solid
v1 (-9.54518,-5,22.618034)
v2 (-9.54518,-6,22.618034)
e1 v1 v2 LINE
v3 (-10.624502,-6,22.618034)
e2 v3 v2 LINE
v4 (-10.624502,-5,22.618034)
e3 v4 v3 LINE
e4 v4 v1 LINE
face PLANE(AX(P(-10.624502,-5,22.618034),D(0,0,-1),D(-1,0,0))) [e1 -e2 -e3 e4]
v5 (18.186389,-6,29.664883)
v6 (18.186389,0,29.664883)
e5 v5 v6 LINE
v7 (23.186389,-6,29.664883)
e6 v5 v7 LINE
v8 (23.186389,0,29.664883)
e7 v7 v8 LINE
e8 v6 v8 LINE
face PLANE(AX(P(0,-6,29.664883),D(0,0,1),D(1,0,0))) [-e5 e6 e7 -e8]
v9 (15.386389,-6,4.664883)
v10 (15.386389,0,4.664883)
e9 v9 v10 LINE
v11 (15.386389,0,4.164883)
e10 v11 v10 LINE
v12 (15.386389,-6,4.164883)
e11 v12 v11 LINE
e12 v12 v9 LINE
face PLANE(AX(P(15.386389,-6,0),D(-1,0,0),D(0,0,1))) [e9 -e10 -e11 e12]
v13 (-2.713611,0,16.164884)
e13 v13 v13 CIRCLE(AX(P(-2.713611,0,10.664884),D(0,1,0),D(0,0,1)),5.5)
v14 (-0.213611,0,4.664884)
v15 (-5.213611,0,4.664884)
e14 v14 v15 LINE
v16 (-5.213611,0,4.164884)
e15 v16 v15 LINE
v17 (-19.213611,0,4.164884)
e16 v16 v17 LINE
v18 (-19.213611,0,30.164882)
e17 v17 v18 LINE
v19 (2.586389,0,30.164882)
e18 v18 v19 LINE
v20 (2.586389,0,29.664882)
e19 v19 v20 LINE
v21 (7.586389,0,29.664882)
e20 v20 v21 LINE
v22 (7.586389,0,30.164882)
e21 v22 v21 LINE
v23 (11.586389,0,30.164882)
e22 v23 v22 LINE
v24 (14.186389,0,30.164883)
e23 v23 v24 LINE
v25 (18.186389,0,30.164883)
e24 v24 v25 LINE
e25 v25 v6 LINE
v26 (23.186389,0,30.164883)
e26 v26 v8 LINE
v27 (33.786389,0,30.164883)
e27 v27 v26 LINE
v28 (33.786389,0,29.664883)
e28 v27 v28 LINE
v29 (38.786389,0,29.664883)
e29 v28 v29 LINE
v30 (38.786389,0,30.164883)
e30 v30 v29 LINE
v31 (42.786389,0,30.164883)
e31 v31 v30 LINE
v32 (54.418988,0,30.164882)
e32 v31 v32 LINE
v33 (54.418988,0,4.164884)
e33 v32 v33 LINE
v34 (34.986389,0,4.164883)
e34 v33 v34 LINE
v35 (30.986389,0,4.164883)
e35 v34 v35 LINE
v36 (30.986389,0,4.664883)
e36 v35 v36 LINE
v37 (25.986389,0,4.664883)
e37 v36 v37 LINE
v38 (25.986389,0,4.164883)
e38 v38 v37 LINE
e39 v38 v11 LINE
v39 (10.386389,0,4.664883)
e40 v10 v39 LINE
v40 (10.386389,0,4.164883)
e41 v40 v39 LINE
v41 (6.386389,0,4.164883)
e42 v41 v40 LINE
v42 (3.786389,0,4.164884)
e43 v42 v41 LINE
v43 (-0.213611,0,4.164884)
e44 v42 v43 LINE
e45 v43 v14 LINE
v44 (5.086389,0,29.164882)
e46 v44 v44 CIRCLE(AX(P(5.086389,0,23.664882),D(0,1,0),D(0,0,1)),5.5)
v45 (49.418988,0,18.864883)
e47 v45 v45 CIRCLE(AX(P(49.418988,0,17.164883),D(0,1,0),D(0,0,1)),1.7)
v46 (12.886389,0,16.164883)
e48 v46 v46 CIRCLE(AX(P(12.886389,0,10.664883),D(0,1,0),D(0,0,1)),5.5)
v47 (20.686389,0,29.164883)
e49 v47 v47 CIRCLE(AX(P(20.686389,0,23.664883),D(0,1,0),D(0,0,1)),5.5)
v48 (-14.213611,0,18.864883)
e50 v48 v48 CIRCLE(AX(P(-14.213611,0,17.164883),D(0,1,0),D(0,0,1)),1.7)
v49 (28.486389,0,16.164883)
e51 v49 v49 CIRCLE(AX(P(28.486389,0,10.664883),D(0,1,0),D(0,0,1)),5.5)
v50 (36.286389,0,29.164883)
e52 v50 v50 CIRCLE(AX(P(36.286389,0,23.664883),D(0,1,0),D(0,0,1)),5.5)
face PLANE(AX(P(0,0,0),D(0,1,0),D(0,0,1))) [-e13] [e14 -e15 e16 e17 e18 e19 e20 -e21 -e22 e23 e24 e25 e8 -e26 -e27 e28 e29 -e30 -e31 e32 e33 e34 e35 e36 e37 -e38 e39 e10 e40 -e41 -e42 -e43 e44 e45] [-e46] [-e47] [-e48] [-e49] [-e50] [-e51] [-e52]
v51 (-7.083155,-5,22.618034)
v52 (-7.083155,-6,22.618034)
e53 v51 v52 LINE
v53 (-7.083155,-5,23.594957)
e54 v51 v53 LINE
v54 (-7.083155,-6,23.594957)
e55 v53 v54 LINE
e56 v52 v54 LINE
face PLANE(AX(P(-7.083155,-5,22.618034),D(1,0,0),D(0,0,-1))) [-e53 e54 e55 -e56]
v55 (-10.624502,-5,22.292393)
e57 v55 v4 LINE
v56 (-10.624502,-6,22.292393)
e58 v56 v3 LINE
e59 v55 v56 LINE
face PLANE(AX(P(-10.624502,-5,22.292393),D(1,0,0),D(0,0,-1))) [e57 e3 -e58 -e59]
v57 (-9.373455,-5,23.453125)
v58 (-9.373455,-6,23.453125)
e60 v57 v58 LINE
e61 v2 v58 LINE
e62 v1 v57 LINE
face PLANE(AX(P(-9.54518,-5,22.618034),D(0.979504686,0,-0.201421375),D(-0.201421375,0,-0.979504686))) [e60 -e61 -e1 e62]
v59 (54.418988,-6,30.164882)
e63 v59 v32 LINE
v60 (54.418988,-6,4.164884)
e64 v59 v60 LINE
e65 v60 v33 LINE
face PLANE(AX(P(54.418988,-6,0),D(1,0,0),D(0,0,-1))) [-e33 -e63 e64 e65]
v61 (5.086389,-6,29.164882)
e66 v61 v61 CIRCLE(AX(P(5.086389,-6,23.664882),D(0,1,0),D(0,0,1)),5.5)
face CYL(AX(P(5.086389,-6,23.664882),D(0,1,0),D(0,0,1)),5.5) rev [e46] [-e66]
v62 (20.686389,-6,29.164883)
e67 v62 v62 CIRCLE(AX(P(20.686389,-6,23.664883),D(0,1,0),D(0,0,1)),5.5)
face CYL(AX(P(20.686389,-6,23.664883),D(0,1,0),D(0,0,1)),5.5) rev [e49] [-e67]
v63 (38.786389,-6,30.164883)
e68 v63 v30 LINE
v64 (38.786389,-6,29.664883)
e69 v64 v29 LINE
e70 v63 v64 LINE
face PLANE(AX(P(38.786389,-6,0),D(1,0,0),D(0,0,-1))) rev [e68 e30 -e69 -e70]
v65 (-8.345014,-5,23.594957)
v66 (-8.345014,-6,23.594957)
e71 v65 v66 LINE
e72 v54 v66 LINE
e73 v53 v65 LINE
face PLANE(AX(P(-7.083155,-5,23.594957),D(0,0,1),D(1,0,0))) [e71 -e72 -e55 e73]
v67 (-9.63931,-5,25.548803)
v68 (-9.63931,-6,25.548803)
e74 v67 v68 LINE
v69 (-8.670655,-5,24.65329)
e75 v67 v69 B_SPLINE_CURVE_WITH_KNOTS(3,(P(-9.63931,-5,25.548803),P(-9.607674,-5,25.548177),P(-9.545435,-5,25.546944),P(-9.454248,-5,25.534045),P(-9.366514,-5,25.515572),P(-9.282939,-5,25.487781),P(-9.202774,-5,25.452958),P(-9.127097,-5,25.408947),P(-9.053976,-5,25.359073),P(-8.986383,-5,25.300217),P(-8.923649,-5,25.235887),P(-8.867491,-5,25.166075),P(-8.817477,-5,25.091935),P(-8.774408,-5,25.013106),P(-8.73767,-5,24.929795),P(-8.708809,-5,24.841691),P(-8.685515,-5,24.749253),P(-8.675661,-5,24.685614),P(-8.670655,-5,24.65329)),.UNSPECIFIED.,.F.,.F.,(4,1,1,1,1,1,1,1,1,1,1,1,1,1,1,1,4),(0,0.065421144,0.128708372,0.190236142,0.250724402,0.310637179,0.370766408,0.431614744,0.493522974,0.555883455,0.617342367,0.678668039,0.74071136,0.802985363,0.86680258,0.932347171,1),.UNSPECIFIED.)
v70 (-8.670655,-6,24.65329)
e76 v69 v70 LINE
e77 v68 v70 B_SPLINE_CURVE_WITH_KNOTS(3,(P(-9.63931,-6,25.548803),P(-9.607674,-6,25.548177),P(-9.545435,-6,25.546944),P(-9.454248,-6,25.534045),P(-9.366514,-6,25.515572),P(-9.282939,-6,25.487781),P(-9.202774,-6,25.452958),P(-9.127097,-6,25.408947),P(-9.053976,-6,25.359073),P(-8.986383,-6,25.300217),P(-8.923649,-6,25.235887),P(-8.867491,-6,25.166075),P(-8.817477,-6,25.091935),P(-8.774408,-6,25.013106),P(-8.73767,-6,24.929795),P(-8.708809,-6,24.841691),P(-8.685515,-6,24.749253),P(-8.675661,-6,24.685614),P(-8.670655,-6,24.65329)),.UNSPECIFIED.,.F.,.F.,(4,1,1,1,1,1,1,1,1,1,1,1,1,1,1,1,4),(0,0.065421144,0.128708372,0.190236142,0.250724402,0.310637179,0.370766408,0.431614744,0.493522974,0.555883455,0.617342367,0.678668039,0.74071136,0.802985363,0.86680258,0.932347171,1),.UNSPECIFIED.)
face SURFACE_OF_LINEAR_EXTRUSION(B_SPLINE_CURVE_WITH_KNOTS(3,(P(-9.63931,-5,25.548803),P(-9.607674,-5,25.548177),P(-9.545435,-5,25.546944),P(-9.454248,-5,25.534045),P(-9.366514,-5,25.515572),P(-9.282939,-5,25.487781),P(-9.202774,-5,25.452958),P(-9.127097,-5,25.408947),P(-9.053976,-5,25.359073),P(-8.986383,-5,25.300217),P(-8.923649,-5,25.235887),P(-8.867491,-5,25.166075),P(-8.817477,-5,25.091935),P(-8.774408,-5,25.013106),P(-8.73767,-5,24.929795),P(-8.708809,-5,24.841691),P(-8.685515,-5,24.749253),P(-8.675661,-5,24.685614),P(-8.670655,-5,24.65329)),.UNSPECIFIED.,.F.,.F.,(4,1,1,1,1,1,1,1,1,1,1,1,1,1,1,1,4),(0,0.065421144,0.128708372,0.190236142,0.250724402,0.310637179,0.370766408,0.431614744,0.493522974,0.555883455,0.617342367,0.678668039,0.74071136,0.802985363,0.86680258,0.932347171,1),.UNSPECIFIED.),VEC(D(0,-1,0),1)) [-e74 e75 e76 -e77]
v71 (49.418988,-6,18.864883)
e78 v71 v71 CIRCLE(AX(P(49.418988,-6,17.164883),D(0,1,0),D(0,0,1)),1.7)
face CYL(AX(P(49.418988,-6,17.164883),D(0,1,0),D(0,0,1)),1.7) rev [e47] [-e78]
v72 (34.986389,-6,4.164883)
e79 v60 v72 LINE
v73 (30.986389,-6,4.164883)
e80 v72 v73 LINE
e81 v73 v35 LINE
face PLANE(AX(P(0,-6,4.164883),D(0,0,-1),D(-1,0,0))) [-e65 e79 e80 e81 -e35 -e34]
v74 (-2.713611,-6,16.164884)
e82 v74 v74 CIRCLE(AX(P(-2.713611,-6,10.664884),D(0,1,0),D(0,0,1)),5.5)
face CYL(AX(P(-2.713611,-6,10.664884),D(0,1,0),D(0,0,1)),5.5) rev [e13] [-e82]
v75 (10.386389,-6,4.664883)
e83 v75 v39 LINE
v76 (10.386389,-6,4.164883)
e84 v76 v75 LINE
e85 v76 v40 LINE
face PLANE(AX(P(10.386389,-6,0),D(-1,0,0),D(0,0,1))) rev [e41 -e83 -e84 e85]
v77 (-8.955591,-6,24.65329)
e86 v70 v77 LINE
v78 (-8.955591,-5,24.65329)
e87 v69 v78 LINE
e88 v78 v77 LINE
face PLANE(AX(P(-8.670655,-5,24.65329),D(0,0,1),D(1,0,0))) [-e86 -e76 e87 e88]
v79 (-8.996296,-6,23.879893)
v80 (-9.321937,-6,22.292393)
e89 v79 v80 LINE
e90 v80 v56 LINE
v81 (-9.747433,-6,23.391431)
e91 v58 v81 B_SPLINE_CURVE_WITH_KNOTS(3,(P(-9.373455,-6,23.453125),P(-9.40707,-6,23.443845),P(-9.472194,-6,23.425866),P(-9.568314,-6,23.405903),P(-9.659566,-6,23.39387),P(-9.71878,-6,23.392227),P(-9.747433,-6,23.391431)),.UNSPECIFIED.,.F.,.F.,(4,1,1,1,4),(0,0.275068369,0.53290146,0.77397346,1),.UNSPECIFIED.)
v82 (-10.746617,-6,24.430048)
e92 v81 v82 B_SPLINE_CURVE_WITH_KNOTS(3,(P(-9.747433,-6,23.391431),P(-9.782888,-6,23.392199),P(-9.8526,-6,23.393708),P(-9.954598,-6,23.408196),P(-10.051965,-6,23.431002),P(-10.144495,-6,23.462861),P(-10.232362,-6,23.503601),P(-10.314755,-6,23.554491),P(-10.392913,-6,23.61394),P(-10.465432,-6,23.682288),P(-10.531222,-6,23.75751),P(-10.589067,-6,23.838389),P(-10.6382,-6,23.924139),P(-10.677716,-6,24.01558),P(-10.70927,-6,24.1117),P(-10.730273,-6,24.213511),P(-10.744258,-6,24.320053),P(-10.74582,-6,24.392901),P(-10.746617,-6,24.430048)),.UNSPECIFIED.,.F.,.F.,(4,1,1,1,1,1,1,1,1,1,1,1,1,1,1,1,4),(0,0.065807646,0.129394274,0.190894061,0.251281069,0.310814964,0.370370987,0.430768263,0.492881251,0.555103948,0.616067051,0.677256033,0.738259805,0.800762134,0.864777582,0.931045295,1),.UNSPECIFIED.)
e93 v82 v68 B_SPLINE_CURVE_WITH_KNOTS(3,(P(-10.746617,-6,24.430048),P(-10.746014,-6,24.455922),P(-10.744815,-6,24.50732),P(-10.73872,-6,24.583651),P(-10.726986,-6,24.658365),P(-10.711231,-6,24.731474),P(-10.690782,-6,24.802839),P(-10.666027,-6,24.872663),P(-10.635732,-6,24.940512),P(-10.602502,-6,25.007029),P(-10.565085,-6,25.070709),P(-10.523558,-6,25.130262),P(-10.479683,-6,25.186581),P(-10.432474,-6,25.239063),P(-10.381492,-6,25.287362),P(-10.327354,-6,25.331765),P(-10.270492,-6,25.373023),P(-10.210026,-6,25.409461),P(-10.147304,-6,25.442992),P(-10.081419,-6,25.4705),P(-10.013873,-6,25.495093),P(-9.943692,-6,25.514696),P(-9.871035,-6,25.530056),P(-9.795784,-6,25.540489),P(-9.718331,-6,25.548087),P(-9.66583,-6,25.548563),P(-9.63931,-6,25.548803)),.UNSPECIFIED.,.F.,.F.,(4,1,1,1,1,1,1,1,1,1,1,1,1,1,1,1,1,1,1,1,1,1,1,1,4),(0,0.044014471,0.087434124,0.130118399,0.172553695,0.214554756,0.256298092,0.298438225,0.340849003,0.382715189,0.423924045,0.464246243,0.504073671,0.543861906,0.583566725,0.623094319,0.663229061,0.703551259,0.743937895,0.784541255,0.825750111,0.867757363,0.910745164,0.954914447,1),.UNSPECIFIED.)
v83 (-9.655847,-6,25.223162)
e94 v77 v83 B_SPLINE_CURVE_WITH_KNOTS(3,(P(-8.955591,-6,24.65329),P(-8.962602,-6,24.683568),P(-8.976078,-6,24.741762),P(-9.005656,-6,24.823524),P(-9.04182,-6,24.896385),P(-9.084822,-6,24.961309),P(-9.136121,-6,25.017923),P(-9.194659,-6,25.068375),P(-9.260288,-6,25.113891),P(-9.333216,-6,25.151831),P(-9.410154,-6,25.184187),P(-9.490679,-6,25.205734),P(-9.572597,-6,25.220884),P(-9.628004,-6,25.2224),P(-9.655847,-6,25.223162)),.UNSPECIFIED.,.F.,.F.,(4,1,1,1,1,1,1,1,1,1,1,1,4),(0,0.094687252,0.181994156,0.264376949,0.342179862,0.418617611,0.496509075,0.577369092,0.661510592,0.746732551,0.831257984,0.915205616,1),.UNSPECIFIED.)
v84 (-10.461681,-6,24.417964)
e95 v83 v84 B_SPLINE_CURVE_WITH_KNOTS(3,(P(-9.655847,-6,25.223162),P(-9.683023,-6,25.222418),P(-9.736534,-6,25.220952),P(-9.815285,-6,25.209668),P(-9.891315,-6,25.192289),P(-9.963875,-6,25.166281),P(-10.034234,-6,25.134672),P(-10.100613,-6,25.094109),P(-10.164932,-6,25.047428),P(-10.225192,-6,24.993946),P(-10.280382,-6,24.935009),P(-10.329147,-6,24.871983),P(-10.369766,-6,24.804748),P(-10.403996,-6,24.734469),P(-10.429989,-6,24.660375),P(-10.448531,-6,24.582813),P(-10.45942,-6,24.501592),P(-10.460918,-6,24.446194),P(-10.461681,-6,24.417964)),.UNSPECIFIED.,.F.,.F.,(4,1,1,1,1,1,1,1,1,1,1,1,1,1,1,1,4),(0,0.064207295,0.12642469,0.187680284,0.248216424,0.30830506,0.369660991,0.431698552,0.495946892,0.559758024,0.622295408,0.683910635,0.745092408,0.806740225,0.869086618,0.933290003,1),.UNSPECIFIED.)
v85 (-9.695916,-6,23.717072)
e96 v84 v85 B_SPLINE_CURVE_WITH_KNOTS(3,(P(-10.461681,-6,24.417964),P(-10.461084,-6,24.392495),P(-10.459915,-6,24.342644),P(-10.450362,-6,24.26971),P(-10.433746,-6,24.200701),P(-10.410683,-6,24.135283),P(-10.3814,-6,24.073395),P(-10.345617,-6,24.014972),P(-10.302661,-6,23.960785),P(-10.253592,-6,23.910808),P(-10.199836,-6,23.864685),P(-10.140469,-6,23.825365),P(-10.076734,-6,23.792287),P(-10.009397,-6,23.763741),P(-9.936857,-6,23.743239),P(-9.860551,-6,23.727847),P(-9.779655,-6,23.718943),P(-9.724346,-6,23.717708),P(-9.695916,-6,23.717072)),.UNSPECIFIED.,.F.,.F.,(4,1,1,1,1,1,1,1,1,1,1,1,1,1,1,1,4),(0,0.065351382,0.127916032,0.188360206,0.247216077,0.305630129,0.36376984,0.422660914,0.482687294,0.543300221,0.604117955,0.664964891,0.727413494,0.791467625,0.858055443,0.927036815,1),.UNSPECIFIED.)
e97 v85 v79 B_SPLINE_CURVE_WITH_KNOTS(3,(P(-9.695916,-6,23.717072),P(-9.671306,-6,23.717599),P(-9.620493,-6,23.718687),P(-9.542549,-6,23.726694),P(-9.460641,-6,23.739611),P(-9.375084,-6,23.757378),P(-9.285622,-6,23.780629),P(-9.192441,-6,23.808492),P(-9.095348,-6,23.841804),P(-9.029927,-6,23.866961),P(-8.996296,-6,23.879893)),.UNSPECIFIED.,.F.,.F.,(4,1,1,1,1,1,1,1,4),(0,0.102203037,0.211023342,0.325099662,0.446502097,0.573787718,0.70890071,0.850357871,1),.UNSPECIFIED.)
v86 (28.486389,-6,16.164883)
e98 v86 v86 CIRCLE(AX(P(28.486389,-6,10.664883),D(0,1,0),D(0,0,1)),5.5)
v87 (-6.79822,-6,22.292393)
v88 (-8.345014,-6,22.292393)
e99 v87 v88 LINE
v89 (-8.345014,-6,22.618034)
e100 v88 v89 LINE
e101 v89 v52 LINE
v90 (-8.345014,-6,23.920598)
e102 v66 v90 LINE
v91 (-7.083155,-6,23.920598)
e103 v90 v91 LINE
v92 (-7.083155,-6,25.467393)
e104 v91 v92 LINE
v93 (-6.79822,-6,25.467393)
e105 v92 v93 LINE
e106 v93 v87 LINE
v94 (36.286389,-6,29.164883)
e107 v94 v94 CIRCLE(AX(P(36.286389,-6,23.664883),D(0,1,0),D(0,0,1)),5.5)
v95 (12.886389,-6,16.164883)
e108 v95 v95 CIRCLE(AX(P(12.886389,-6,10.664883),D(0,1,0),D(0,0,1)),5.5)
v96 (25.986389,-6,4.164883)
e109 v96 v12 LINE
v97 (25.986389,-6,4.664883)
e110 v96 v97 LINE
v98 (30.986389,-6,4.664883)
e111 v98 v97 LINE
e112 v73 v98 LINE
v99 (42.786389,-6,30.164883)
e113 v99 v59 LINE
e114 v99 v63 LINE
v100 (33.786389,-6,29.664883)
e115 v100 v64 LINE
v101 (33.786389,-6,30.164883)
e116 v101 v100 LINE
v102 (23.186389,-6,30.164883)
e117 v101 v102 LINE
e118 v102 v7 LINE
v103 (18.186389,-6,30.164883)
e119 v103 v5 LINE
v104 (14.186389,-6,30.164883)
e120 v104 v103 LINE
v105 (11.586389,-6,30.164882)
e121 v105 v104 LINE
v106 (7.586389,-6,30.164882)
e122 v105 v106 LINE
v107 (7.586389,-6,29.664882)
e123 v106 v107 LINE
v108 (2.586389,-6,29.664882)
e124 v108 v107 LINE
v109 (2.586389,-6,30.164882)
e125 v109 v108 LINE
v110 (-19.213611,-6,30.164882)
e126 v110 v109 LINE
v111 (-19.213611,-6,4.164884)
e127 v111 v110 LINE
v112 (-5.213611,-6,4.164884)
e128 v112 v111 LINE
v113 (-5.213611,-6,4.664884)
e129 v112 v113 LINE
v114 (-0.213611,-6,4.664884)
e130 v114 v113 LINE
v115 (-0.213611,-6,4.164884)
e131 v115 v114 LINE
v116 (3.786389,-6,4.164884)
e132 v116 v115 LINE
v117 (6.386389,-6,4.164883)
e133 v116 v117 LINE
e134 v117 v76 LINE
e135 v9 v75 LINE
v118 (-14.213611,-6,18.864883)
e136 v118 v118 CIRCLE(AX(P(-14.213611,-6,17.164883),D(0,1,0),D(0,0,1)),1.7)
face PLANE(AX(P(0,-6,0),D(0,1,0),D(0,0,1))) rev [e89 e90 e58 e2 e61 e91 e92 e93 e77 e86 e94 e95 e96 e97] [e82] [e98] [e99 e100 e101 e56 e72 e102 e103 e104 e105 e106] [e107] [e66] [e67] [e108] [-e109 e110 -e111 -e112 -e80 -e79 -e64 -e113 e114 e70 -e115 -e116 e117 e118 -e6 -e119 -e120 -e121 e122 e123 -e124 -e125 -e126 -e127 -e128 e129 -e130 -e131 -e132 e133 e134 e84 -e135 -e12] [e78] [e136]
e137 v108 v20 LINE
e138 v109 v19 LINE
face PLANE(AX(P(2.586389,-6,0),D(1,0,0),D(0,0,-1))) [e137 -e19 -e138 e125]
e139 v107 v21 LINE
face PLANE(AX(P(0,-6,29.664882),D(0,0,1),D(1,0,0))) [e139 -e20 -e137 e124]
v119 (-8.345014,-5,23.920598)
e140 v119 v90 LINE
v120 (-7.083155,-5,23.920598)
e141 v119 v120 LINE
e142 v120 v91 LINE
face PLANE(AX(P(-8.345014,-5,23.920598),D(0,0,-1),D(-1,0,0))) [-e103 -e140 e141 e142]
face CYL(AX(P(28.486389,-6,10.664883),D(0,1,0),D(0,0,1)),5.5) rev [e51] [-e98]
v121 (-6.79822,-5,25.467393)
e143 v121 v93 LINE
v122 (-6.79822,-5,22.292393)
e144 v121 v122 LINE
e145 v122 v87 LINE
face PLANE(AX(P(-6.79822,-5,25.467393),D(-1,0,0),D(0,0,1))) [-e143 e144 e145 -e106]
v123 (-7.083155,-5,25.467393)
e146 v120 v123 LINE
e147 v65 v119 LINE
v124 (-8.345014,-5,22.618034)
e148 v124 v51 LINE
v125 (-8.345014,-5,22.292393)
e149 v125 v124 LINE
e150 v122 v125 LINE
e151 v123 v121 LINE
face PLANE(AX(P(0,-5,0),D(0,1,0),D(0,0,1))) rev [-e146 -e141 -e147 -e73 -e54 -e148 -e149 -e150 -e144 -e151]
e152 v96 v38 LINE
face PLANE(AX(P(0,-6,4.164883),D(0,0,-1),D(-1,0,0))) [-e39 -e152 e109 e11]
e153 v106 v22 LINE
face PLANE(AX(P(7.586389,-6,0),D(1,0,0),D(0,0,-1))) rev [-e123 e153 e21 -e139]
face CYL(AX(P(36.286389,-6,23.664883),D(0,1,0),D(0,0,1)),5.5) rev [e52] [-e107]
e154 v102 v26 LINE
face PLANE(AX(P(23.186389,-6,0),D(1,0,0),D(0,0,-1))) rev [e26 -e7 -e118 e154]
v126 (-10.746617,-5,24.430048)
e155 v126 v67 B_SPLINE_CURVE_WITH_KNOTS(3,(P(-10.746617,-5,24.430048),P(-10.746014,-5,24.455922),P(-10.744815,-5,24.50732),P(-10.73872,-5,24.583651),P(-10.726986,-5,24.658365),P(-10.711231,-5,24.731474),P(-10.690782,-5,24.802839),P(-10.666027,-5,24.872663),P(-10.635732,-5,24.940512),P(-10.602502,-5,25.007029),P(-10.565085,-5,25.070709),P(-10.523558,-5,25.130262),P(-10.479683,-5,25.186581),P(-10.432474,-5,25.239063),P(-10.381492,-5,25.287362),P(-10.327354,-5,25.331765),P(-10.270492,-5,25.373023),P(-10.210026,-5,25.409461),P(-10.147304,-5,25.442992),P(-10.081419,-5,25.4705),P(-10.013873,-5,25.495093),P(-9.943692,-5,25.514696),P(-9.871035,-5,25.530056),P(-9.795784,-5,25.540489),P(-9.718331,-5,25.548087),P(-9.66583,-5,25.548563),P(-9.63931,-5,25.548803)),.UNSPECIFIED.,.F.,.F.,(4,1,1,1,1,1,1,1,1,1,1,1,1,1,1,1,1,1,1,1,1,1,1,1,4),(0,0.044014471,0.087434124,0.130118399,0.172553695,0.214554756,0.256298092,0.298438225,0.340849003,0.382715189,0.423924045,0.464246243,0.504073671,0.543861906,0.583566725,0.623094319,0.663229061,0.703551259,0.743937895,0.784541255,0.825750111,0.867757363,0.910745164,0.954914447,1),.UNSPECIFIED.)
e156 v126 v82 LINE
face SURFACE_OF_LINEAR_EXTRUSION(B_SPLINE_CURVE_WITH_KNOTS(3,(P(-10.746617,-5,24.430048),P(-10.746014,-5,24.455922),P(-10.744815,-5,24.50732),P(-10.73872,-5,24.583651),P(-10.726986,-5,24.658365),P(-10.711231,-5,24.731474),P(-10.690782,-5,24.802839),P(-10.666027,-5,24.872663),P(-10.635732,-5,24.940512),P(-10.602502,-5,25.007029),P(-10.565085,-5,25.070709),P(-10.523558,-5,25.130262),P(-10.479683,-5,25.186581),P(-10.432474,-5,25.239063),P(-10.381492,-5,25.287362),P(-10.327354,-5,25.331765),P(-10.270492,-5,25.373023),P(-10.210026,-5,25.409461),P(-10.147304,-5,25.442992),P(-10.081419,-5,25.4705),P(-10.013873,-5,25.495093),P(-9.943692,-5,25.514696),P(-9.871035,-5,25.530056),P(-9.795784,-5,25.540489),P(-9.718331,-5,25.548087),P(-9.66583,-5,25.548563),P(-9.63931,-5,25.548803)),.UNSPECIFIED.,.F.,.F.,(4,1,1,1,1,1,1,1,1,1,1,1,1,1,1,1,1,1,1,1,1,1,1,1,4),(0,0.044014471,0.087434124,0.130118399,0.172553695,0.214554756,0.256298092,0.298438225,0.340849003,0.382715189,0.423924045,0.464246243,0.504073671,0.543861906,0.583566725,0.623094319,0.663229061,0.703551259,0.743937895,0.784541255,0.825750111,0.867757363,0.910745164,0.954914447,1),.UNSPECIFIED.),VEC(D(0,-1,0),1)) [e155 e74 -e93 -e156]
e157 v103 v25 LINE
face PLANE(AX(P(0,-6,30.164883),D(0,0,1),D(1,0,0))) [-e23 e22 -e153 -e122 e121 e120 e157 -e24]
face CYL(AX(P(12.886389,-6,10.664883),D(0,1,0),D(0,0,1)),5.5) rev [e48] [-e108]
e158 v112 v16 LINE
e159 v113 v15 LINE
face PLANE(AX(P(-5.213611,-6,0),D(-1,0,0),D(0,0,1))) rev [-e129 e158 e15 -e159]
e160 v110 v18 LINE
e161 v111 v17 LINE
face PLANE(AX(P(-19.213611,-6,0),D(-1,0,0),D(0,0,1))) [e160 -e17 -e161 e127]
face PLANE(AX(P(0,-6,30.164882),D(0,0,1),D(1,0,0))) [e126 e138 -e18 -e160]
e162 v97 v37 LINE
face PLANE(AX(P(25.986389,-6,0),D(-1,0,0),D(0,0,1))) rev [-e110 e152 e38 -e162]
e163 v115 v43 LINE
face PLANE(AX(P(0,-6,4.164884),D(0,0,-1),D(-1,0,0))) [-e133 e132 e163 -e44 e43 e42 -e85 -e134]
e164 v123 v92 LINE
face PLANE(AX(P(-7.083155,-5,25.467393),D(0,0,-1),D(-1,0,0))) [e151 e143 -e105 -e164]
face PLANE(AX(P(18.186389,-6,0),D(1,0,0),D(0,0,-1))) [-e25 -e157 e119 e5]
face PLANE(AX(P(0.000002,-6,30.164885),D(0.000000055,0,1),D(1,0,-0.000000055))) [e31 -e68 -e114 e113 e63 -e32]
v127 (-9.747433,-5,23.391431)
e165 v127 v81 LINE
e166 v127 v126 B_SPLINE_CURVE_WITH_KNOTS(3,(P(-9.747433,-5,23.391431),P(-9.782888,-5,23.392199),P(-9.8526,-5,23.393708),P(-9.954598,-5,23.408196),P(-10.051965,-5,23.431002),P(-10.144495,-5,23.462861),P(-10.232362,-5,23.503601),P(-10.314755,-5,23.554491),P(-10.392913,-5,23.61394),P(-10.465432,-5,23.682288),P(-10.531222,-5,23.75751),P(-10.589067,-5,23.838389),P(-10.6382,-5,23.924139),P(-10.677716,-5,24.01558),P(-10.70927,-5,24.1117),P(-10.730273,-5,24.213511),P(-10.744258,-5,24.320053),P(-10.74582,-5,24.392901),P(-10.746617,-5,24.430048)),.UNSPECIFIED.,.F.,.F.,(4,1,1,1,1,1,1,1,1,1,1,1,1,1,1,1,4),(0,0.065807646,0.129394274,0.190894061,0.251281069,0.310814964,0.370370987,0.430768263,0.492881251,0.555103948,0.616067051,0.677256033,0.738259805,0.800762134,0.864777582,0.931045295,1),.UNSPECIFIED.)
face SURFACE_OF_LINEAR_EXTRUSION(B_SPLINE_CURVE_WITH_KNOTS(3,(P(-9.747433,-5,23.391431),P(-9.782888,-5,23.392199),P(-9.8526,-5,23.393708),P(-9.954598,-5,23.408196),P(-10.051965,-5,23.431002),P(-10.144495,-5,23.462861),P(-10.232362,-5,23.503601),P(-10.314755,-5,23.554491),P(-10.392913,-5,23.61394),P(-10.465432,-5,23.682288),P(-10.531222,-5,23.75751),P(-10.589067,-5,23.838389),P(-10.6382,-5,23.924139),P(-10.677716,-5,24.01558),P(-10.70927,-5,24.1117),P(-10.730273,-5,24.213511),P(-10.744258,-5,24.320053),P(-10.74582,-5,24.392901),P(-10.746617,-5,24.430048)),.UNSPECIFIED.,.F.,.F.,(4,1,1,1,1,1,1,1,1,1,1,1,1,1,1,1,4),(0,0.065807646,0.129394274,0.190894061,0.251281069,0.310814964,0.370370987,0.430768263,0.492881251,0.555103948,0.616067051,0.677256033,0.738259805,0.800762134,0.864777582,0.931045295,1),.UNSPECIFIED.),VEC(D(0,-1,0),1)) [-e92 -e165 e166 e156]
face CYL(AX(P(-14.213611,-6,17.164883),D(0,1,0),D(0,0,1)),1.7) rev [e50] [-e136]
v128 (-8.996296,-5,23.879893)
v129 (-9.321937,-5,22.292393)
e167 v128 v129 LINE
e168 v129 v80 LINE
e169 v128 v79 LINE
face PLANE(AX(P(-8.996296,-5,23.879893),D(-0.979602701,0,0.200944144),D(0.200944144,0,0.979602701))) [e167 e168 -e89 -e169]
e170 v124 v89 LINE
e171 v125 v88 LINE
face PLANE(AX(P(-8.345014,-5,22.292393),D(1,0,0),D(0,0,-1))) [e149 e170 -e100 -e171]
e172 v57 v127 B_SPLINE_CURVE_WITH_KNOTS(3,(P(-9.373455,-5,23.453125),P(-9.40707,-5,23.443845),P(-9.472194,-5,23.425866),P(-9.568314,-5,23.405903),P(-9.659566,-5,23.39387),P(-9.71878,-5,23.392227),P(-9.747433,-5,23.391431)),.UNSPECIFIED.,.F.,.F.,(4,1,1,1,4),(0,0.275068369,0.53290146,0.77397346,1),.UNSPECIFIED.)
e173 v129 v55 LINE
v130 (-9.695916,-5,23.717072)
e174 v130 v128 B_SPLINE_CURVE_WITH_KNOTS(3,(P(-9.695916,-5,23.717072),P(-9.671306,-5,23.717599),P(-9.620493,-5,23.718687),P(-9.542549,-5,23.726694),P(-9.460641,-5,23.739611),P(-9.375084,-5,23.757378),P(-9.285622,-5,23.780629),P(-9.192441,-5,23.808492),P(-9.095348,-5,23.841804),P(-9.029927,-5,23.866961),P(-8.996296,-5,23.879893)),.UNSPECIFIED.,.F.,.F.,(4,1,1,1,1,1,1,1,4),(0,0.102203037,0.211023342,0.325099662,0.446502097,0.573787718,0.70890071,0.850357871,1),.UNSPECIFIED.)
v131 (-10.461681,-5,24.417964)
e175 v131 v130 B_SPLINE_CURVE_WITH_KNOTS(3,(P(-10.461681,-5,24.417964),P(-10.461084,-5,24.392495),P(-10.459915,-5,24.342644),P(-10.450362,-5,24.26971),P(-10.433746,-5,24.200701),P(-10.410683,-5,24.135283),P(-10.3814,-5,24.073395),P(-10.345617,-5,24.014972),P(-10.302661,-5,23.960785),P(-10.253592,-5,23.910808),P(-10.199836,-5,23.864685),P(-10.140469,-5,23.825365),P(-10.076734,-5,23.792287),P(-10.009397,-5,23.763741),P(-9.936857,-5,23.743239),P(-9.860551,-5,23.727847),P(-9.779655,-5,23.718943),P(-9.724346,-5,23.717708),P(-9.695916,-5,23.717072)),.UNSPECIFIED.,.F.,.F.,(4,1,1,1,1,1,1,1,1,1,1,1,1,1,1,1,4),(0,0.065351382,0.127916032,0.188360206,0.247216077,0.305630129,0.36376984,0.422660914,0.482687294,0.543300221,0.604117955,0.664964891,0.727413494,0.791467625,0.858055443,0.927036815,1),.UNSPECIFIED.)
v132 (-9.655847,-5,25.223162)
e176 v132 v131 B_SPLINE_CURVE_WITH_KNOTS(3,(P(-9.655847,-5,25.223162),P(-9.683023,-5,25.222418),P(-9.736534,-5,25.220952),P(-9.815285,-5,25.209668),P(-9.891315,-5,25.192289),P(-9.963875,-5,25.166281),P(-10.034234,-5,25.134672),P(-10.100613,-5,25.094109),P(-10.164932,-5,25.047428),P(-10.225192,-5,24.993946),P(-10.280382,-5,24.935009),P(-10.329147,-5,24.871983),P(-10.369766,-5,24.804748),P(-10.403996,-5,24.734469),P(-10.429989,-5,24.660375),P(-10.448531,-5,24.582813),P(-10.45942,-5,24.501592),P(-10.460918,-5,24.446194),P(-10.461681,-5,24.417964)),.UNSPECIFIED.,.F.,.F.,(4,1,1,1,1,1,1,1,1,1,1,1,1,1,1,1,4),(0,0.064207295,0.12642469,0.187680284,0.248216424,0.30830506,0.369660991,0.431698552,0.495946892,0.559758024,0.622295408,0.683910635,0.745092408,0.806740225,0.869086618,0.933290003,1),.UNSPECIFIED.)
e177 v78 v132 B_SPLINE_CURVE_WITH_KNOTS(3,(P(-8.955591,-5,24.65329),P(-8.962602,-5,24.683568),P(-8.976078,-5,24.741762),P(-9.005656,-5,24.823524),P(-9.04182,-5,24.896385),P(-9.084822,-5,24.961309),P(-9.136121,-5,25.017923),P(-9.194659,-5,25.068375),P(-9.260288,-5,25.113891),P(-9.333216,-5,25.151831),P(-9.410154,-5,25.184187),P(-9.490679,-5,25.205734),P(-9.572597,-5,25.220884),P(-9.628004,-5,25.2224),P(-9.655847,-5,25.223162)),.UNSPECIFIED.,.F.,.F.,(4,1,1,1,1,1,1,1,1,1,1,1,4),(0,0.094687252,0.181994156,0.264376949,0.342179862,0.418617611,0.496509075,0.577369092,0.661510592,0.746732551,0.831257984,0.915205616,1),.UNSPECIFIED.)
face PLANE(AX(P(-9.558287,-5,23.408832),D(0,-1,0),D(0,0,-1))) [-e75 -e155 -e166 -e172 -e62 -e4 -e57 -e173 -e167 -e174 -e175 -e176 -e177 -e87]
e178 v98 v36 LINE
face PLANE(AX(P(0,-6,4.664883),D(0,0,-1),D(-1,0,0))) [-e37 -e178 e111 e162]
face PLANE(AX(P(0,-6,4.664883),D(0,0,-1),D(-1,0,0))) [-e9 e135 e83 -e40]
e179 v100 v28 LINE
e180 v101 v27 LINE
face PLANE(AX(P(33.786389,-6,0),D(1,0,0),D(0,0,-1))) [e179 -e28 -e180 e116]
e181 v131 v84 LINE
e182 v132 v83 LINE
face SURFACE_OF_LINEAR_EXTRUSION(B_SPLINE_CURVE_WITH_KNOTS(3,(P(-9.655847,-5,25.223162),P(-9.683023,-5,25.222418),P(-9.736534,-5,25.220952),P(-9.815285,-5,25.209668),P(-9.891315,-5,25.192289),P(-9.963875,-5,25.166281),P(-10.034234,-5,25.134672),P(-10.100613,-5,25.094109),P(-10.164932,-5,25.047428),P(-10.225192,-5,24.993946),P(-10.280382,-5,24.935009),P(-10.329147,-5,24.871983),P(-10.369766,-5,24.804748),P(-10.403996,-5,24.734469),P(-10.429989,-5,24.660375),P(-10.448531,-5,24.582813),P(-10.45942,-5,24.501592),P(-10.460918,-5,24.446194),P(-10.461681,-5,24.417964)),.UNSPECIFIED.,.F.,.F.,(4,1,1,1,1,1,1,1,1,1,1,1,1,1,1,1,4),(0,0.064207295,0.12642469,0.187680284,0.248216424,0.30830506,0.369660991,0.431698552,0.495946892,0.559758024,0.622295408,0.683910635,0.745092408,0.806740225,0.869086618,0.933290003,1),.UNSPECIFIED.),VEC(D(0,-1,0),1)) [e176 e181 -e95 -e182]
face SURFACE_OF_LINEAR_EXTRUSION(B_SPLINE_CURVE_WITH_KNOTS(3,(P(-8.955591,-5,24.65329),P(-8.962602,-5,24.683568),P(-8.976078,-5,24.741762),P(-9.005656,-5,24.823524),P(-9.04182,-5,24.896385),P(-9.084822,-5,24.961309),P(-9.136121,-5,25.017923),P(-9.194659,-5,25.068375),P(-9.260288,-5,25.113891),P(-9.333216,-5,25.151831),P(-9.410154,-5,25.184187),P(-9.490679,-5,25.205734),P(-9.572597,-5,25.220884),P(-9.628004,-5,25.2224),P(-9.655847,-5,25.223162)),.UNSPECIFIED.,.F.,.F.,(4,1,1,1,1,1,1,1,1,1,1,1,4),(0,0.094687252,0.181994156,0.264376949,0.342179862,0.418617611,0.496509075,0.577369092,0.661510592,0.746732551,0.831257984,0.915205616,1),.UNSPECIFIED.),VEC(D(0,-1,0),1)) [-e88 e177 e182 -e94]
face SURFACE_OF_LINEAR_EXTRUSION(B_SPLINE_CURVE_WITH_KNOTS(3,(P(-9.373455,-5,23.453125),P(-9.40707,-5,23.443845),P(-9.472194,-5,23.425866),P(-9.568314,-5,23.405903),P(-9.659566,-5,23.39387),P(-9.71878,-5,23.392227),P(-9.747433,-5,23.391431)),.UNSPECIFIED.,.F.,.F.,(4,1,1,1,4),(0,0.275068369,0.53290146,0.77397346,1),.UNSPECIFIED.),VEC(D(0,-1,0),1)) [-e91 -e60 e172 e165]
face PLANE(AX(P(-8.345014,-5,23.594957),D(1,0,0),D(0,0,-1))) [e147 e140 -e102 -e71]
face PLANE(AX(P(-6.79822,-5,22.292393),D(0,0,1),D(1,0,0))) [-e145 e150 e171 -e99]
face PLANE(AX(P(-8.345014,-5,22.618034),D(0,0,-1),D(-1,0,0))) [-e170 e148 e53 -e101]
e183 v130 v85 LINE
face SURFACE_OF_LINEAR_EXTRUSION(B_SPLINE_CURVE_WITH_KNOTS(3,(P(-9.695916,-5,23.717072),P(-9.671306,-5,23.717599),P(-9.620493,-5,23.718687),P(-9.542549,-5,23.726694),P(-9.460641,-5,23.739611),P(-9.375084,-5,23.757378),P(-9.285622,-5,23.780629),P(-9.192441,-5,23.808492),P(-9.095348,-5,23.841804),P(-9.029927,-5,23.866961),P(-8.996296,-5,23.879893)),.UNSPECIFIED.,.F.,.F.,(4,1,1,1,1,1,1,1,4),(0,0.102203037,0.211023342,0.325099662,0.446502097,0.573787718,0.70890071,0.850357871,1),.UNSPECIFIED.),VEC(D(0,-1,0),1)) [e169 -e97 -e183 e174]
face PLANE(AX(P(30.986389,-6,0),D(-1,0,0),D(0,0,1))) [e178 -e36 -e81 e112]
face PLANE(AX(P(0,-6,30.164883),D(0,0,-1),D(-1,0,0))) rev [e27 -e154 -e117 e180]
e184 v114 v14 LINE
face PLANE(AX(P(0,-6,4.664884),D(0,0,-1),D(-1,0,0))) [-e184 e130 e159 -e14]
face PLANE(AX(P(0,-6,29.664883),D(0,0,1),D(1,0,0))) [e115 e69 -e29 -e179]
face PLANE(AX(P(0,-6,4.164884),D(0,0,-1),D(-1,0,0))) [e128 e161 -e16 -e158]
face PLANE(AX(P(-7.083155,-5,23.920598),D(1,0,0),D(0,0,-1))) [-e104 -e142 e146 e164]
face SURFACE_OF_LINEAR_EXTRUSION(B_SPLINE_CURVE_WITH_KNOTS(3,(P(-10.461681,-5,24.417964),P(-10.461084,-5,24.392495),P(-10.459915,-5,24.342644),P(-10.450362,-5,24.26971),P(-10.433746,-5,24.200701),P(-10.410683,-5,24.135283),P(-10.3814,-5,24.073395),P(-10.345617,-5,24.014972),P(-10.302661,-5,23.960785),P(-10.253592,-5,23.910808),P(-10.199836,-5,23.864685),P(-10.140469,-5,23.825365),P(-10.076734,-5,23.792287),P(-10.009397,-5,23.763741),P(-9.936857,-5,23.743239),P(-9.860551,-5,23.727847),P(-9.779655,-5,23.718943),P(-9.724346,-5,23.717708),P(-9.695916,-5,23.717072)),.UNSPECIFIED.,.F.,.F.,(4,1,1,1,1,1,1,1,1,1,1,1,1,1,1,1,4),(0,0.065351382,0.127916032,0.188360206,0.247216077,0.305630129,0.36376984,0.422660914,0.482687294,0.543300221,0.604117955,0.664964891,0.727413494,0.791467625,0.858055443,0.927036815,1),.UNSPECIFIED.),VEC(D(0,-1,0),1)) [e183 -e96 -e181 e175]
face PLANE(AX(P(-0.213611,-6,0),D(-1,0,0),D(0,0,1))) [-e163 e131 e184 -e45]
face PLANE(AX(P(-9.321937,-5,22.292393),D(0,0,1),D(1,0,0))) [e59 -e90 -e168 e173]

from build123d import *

# Parameters (mm, degrees)
SKETCH1_W             = 12
SKETCH1_H             = 12
SKETCH1_R             = 5.5
BOSS_EXTRUDE1_DEPTH   = 6
BOSS_EXTRUDE1_2_DEPTH = 6
BOSS_EXTRUDE1_3_DEPTH = 6
BOSS_EXTRUDE1_4_DEPTH = 6
BOSS_EXTRUDE1_5_DEPTH = 6
BOSS_EXTRUDE1_6_DEPTH = 6
SKETCH1_3_R           = 1.7
BOSS_EXTRUDE2_DEPTH   = 6
CUT_EXTRUDE1_DEPTH    = 1


with BuildPart() as part:
    # Sketch1 → Boss-Extrude1 (new body)
    with BuildSketch(Plane(origin=(0, 0, 0), x_dir=(1, 0, 0), z_dir=(0, 1, 0))):
        with Locations((-2.713611414, -10.664883528)):
            Rectangle(SKETCH1_W, SKETCH1_H)
        with Locations((-2.713611414, -10.664883528)):
            Circle(SKETCH1_R, mode=Mode.SUBTRACT)
    extrude(amount=-BOSS_EXTRUDE1_DEPTH)



with BuildPart() as body_2:
    # Sketch1 → Boss-Extrude1 2 (new body)
    with BuildSketch(Plane(origin=(0, 0, 0), x_dir=(1, 0, 0), z_dir=(0, 1, 0))):
        with Locations((12.886388586, -10.664882884)):
            Rectangle(SKETCH1_W, SKETCH1_H)
        with Locations((12.886388586, -10.664882884)):
            Circle(SKETCH1_R, mode=Mode.SUBTRACT)
    extrude(amount=-BOSS_EXTRUDE1_2_DEPTH)


with BuildPart() as body_3:
    # Sketch1 → Boss-Extrude1 3 (new body)
    with BuildSketch(Plane(origin=(0, 0, 0), x_dir=(1, 0, 0), z_dir=(0, 1, 0))):
        with Locations((5.086388588, -23.66488245)):
            Rectangle(SKETCH1_W, SKETCH1_H)
        with Locations((5.086388588, -23.66488245)):
            Circle(SKETCH1_R, mode=Mode.SUBTRACT)
    extrude(amount=-BOSS_EXTRUDE1_3_DEPTH)


with BuildPart() as body_4:
    # Sketch1 → Boss-Extrude1 4 (new body)
    with BuildSketch(Plane(origin=(0, 0, 0), x_dir=(1, 0, 0), z_dir=(0, 1, 0))):
        with Locations((20.686388588, -23.664882884)):
            Rectangle(SKETCH1_W, SKETCH1_H)
        with Locations((20.686388588, -23.664882884)):
            Circle(SKETCH1_R, mode=Mode.SUBTRACT)
    extrude(amount=-BOSS_EXTRUDE1_4_DEPTH)


with BuildPart() as body_5:
    # Sketch1 → Boss-Extrude1 5 (new body)
    with BuildSketch(Plane(origin=(0, 0, 0), x_dir=(1, 0, 0), z_dir=(0, 1, 0))):
        with Locations((28.486388586, -10.664882884)):
            Rectangle(SKETCH1_W, SKETCH1_H)
        with Locations((28.486388586, -10.664882884)):
            Circle(SKETCH1_R, mode=Mode.SUBTRACT)
    extrude(amount=-BOSS_EXTRUDE1_5_DEPTH)


with BuildPart() as body_6:
    # Sketch1 → Boss-Extrude1 6 (new body)
    with BuildSketch(Plane(origin=(0, 0, 0), x_dir=(1, 0, 0), z_dir=(0, 1, 0))):
        with Locations((36.286388588, -23.664883087)):
            Rectangle(SKETCH1_W, SKETCH1_H)
        with Locations((36.286388588, -23.664883087)):
            Circle(SKETCH1_R, mode=Mode.SUBTRACT)
    extrude(amount=-BOSS_EXTRUDE1_6_DEPTH)


with BuildPart() as part_1:
    add(part.part)

    add(body_2.part)  # Boss-Extrude2 merges body 2

    add(body_3.part)  # Boss-Extrude2 merges body 3

    add(body_4.part)  # Boss-Extrude2 merges body 4

    add(body_5.part)  # Boss-Extrude2 merges body 5

    add(body_6.part)  # Boss-Extrude2 merges body 6
    # Sketch1<3> → Boss-Extrude2 (add)
    with BuildSketch(Plane(origin=(0, 0, 0), x_dir=(1, 0, 0), z_dir=(0, 1, 0))):
        Polygon((6.386388586, -4.164882884), (3.786388586, -4.164883528), (-0.213611414, -4.164883528), (-0.213611414, -4.664883528), (3.286388586, -4.664883528), (3.286388586, -16.664883528), (-8.713611414, -16.664883528), (-8.713611414, -4.664883528), (-5.213611414, -4.664883528), (-5.213611414, -4.164883528), (-19.213611414, -4.164883528), (-19.213611414, -30.16488245), (2.586388588, -30.16488245), (2.586388588, -29.66488245), (-0.913611412, -29.66488245), (-0.913611412, -17.66488245), (11.086388588, -17.66488245), (11.086388588, -29.66488245), (7.586388588, -29.66488245), (7.586388588, -30.16488245), (11.586388588, -30.16488245), (14.186388588, -30.164882884), (18.186388588, -30.164882884), (18.186388588, -29.664882884), (14.686388588, -29.664882884), (14.686388588, -17.664882884), (26.686388588, -17.664882884), (26.686388588, -29.664882884), (23.186388588, -29.664882884), (23.186388588, -30.164882884), (27.186388588, -30.164882884), (29.786388588, -30.164883087), (33.786388588, -30.164883087), (33.786388588, -29.664883087), (30.286388588, -29.664883087), (30.286388588, -17.664883087), (42.286388588, -17.664883087), (42.286388588, -29.664883087), (38.786388588, -29.664883087), (38.786388588, -30.164883087), (42.786388588, -30.164883087), (54.418988347, -30.16488245), (54.418988347, -4.164883528), (34.986388586, -4.164882884), (30.986388586, -4.164882884), (30.986388586, -4.664882884), (34.486388586, -4.664882884), (34.486388586, -16.664882884), (22.486388586, -16.664882884), (22.486388586, -4.664882884), (25.986388586, -4.664882884), (25.986388586, -4.164882884), (15.386388586, -4.164882884), (15.386388586, -4.664882884), (18.886388586, -4.664882884), (18.886388586, -16.664882884), (6.886388586, -16.664882884), (6.886388586, -4.664882884), (10.386388586, -4.664882884), (10.386388586, -4.164882884), align=None)
        with Locations((-14.213611414, -17.164882989)):
            Circle(SKETCH1_3_R, mode=Mode.SUBTRACT)
        with Locations((49.418988347, -17.164882989)):
            Circle(SKETCH1_3_R, mode=Mode.SUBTRACT)
    extrude(amount=-BOSS_EXTRUDE2_DEPTH)

    # Sketch2 → Cut-Extrude1 (cut)
    with BuildSketch(Plane(origin=(0, -6, 0), x_dir=(-1, 0, 0), z_dir=(0, -1, 0))):
        Polygon((6.798219501, -22.292392997), (8.345014372, -22.292392997), (8.345014372, -22.618034023), (7.083155398, -22.618034023), (7.083155398, -23.5949571), (8.345014372, -23.5949571), (8.345014372, -23.920598125), (7.083155398, -23.920598125), (7.083155398, -25.467392997), (6.798219501, -25.467392997), align=None)
        with BuildLine():
            Line((10.624501552, -22.292392997), (10.624501552, -22.618034023))
            Line((10.624501552, -22.618034023), (9.545179637, -22.618034023))
            Line((9.545179637, -22.618034023), (9.373454877, -23.453125169))
            add(Edge.make_bspline(
                [(9.373454877, -23.453125169), (9.407069849, -23.443844851), (9.47219354, -23.425865702), (9.568314271, -23.405903325), (9.65956577, -23.393869672), (9.718779856, -23.392226555), (9.747433243, -23.391431459)],
                knots=[0, 0, 0, 0, 1.100273476, 2.13160584, 3.095893838, 4, 4, 4, 4], degree=3))
            add(Edge.make_bspline(
                [(9.747433243, -23.391431459), (9.782887778, -23.392198843), (9.852600253, -23.393707713), (9.95459844, -23.408196462), (10.051964708, -23.431001956), (10.144495429, -23.462861287), (10.232361786, -23.50360083), (10.314755359, -23.55449149), (10.392912895, -23.613939584), (10.465432248, -23.682288273), (10.531222156, -23.757510025), (10.589067018, -23.838388951), (10.638200225, -23.924139045), (10.677716053, -24.015579597), (10.709270413, -24.111699686), (10.73027258, -24.213510672), (10.744257737, -24.320052895), (10.745820188, -24.392900612), (10.746616936, -24.430048246)],
                knots=[0, 0, 0, 0, 1.052922333, 2.070308379, 3.05430497, 4.020497103, 4.973039431, 5.925935799, 6.892292201, 7.88610001, 8.88166317, 9.857072816, 10.836096531, 11.812156883, 12.81219415, 13.836441305, 14.89672472, 16, 16, 16, 16], degree=3))
            add(Edge.make_bspline(
                [(10.746616936, -24.430048246), (10.746013618, -24.455921974), (10.744815135, -24.50731977), (10.738720416, -24.583650581), (10.726985874, -24.658365436), (10.711230867, -24.731474249), (10.690781673, -24.802838608), (10.666026603, -24.87266278), (10.635731635, -24.940512173), (10.602501745, -25.007028781), (10.565085297, -25.070708856), (10.523557651, -25.130261865), (10.479683241, -25.186581177), (10.43247427, -25.239062778), (10.381491939, -25.287361801), (10.327353683, -25.331764885), (10.270491502, -25.373022949), (10.210025675, -25.409461241), (10.147303566, -25.442991922), (10.081419397, -25.470499703), (10.013872905, -25.495092824), (9.94369191, -25.514695753), (9.87103538, -25.530055999), (9.795783548, -25.540488687), (9.718331083, -25.548087312), (9.665830179, -25.548562979), (9.639310246, -25.548803254)],
                knots=[0, 0, 0, 0, 1.056347294, 2.098418968, 3.122841568, 4.141288669, 5.149314143, 6.15115421, 7.162517403, 8.180376062, 9.185164535, 10.17417709, 11.141909838, 12.097768115, 13.052685741, 14.0056014, 14.954263652, 15.917497458, 16.885230207, 17.854509472, 18.828990115, 19.81800267, 20.826176721, 21.857883937, 22.917946725, 24, 24, 24, 24], degree=3))
            add(Edge.make_bspline(
                [(9.639310246, -25.548803254), (9.607674382, -25.548176565), (9.545434557, -25.546943629), (9.454248042, -25.534045431), (9.366514079, -25.51557245), (9.282938915, -25.487780977), (9.202773555, -25.452958217), (9.127097232, -25.408947118), (9.053976278, -25.359073217), (8.986383216, -25.300217468), (8.923648742, -25.235886814), (8.867490695, -25.166075239), (8.817476664, -25.09193496), (8.774407565, -25.01310592), (8.737670075, -24.929795253), (8.708809335, -24.841690816), (8.685515399, -24.749252955), (8.675660725, -24.685613699), (8.670655398, -24.653290433)],
                knots=[0, 0, 0, 0, 1.0467383, 2.05933395, 3.04377827, 4.011590433, 4.970194871, 5.932262533, 6.905835911, 7.896367577, 8.894135286, 9.877477877, 10.858688626, 11.851381753, 12.8477658, 13.868841284, 14.917554742, 16, 16, 16, 16], degree=3))
            Line((8.670655398, -24.653290433), (8.955591295, -24.653290433))
            add(Edge.make_bspline(
                [(8.955591295, -24.653290433), (8.962602201, -24.683567644), (8.976077551, -24.741762123), (9.005655623, -24.823524126), (9.041819667, -24.896385136), (9.084822183, -24.961308972), (9.13612114, -25.017922848), (9.19465855, -25.068375469), (9.26028827, -25.113891479), (9.333216414, -25.151830703), (9.410153993, -25.184187358), (9.490678534, -25.205733539), (9.572597477, -25.220883634), (9.628004284, -25.22240016), (9.655846704, -25.223162228)],
                knots=[0, 0, 0, 0, 1.136247022, 2.183929868, 3.172523383, 4.106158343, 5.02341133, 5.958108904, 6.928429099, 7.938127109, 8.96079061, 9.975095812, 10.982467395, 12, 12, 12, 12], degree=3))
            add(Edge.make_bspline(
                [(9.655846704, -25.223162228), (9.683023293, -25.222417665), (9.736534219, -25.220951615), (9.815284548, -25.209667654), (9.891314798, -25.192289), (9.963874758, -25.166281346), (10.034234154, -25.134672208), (10.100613217, -25.094109247), (10.164932256, -25.047427659), (10.225192063, -24.993945573), (10.280382135, -24.935008778), (10.329146616, -24.871982857), (10.369765673, -24.804748289), (10.4039959, -24.734469072), (10.429988536, -24.660374952), (10.448531426, -24.582813172), (10.459419915, -24.501592154), (10.460917771, -24.446193566), (10.461681039, -24.417963911)],
                knots=[0, 0, 0, 0, 1.027316725, 2.022795036, 3.002884548, 3.971462791, 4.93288096, 5.914575861, 6.907176829, 7.935150275, 8.956128384, 9.956726525, 10.942570165, 11.921478529, 12.907843606, 13.90538589, 14.932640048, 16, 16, 16, 16], degree=3))
            add(Edge.make_bspline(
                [(10.461681039, -24.417963911), (10.461083704, -24.392495193), (10.459914506, -24.342643802), (10.450361774, -24.269710237), (10.433745664, -24.20070112), (10.410682573, -24.135283207), (10.381400448, -24.073394799), (10.345617007, -24.014972023), (10.302660711, -23.960784903), (10.25359164, -23.910808086), (10.199836132, -23.864684521), (10.140469308, -23.825365243), (10.076733517, -23.79228726), (10.009396666, -23.76374129), (9.93685708, -23.743239186), (9.860551277, -23.72784689), (9.779655264, -23.718942953), (9.72434614, -23.717707526), (9.695915815, -23.717072484)],
                knots=[0, 0, 0, 0, 1.045622112, 2.046656509, 3.013763289, 3.955457236, 4.890082067, 5.820317437, 6.762574623, 7.722996705, 8.69280354, 9.665887285, 10.63943826, 11.638615906, 12.663482002, 13.728887084, 14.832589034, 16, 16, 16, 16], degree=3))
            add(Edge.make_bspline(
                [(9.695915815, -23.717072484), (9.671306001, -23.717599164), (9.620492978, -23.718686622), (9.5425487, -23.726693516), (9.460641208, -23.73961059), (9.375084487, -23.757378115), (9.285621598, -23.780629163), (9.192441334, -23.808491603), (9.095347778, -23.841803701), (9.0299267, -23.866960781), (8.996296424, -23.879892997)],
                knots=[0, 0, 0, 0, 0.817624296, 1.688186739, 2.600797293, 3.572016777, 4.590301741, 5.671205678, 6.80286297, 8, 8, 8, 8], degree=3))
            Line((8.996296424, -23.879892997), (9.321937449, -22.292392997))
            Line((9.321937449, -22.292392997), (10.624501552, -22.292392997))
        make_face()
    extrude(amount=-CUT_EXTRUDE1_DEPTH, mode=Mode.SUBTRACT)


solid = part_1.part
